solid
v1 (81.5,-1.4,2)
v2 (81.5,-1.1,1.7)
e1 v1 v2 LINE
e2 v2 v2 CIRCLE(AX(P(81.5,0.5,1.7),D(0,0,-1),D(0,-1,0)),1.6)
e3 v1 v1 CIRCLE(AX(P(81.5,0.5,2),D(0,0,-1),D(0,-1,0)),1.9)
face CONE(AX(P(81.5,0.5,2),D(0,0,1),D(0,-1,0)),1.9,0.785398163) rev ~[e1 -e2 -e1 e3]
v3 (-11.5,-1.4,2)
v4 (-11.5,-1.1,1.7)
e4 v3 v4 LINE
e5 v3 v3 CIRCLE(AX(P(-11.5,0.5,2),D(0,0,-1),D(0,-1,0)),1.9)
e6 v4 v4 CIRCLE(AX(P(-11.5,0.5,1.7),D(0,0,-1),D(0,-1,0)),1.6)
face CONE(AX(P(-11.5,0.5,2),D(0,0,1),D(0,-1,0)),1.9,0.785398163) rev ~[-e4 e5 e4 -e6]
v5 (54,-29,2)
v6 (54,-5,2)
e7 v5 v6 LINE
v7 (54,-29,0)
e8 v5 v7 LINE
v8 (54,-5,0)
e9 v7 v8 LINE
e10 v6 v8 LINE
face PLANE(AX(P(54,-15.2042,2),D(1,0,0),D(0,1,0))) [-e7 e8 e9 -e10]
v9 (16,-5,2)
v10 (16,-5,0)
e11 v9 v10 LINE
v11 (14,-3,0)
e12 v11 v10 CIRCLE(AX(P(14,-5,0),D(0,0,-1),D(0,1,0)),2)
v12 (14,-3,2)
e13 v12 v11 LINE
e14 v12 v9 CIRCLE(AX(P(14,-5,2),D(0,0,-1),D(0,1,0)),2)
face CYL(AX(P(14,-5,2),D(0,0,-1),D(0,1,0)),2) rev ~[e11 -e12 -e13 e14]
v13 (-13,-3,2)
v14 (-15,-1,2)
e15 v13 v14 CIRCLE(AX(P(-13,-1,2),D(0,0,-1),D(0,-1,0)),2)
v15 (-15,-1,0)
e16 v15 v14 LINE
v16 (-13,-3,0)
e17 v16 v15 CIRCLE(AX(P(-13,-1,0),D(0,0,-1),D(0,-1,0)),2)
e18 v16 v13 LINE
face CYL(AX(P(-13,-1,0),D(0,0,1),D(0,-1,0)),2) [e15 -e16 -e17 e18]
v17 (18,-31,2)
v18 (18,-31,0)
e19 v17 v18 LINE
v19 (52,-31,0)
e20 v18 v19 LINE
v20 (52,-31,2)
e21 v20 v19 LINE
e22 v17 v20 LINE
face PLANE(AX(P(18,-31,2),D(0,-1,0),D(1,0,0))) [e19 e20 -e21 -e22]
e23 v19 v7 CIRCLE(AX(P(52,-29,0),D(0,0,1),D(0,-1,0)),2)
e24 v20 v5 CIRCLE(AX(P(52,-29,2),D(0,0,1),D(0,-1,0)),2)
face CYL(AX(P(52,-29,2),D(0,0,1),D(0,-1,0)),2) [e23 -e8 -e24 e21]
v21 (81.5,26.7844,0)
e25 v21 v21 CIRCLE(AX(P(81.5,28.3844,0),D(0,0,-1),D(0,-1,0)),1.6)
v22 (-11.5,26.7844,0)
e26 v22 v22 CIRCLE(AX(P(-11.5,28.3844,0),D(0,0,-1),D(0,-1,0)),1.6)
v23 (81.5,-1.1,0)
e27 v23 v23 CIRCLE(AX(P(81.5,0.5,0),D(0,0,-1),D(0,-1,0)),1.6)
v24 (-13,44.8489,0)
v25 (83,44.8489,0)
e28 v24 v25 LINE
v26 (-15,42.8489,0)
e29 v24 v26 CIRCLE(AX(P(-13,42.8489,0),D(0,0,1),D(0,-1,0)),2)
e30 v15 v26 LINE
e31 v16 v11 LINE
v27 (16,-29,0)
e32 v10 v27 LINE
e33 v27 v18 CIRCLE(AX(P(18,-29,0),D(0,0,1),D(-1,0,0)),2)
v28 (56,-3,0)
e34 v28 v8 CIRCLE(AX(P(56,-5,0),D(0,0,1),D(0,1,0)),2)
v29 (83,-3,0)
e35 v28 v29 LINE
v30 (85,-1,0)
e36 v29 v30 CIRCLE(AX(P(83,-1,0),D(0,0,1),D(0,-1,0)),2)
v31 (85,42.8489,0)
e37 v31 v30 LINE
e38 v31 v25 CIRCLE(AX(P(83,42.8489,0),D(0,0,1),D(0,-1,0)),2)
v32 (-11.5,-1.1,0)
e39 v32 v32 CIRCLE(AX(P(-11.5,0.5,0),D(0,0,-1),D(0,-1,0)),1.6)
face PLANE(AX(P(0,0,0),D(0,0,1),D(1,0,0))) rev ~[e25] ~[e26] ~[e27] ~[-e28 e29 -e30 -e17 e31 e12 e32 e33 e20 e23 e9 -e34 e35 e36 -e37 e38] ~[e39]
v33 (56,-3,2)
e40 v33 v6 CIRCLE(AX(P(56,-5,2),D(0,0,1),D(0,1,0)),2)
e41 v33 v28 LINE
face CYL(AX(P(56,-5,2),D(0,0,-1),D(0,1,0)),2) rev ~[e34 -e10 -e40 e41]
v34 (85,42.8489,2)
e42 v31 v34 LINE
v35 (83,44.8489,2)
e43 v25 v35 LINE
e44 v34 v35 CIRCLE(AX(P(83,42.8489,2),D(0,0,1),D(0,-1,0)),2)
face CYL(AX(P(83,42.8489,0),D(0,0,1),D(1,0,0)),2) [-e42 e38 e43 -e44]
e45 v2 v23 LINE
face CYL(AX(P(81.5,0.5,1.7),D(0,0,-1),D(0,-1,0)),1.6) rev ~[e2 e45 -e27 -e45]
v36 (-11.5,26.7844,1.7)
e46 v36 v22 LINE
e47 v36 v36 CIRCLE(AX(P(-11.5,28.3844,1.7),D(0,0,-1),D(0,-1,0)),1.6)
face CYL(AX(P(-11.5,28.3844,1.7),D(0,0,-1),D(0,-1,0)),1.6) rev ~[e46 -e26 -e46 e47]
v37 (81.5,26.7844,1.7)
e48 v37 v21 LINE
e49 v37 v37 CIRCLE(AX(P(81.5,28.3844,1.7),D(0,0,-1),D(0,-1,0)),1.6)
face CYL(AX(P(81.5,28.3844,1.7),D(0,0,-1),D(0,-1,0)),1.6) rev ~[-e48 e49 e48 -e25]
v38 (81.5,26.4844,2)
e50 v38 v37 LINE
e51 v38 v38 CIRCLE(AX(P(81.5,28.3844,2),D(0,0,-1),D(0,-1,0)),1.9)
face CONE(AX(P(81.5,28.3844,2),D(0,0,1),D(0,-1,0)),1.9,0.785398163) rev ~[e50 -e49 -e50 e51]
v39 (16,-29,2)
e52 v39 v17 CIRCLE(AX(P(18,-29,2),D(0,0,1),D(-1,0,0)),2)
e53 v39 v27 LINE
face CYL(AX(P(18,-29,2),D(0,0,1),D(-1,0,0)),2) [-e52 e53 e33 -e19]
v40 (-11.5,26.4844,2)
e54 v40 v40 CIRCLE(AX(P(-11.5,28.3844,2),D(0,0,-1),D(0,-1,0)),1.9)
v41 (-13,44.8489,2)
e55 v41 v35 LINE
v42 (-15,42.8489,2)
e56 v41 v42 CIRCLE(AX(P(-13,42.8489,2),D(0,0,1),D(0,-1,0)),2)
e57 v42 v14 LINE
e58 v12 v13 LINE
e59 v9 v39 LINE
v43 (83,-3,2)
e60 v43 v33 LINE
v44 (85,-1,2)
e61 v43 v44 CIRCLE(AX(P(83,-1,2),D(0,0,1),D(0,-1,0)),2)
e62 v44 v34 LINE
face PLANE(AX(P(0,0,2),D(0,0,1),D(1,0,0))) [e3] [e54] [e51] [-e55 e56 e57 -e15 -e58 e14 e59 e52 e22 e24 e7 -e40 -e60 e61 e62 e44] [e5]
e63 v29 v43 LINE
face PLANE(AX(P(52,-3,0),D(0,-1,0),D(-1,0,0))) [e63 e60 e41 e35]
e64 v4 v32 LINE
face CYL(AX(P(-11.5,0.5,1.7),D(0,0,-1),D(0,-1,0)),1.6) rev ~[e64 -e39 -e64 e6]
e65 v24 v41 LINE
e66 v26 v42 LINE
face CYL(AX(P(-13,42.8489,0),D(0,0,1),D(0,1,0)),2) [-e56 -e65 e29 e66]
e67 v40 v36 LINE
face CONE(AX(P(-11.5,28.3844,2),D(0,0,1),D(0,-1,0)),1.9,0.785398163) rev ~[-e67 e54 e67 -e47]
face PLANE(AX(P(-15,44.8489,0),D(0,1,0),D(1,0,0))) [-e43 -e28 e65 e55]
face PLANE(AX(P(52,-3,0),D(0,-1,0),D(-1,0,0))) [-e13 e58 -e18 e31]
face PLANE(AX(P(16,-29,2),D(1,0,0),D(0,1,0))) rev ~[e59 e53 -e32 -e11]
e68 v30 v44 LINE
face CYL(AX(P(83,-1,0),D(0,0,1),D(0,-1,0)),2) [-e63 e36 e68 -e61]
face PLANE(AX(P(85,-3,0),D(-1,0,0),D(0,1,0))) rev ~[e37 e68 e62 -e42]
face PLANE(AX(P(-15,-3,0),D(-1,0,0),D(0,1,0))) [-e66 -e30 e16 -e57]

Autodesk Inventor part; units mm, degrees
ref_plane "YZ Plane" through (0, 0, 0) normal (1, 0, 0) x (0, 1, 0)
ref_plane "XZ Plane" through (0, 0, 0) normal (0, 1, 0) x (-1, 0, 0)
ref_plane "XY Plane" through (0, 0, 0) normal (0, 0, 1) x (1, 0, 0)
sketch "Szkic1" plane through (0, 0, 0) normal (0, 0, 1) x (1, 0, 0)
  line L0 (54, -15.2042) -> (54, -5) projected
  line L1 (18, -31) -> (52, -31) projected
  circle A0 centre (35, -25.5) radius 3.5 projected
  circle A1 centre (26, -7) radius 3.5 projected
  circle A2 centre (44, -7) radius 3.5 projected
  line L2 (18, -31) -> (52, -31) projected
  line L3 (54, -24.7958) -> (54, -29) projected
  line L4 (54, -15.2042) -> (54, -5) projected
  line L5 (52, -3) -> (18, -3) projected
  line L6 (16, -5) -> (16, -15.2042) projected
  line L7 (16, -24.7958) -> (16, -20) projected
  line L8 (85, -3) -> (85, 41.8489) projected
  line L9 (-15, 44.8489) -> (85, 44.8489) projected
  line L10 (-15, -3) -> (-15, 41.8489) projected
  line L11 (-15, -4) -> (15.8, -4)
  line L12 (85, 44.8489) -> (-15, 44.8489)
  line L13 (-15, 44.8489) -> (-15, -3)
  line L14 (-15, -3) -> (85, -3)
  line L15 (85, -3) -> (85, 44.8489)
  line L16 (52, -31) -> (16, -31)
  line L17 (16, -31) -> (16, -3)
  line L18 (16, -3) -> (52, -3)
  line L19 (52, -3) -> (52, -31)
  arc A3 (54, -5) -> (52, -3) centre (52, -5) ccw projected
  arc A4 (18, -3) -> (16, -5) centre (18, -5) ccw projected
  line L20 (16, -15.2042) -> (16, -20) projected
  line L21 (16, -29) -> (16, -24.7958) projected
  arc A5 (16, -29) -> (18, -31) centre (18, -29) ccw projected
  arc A6 (52, -31) -> (54, -29) centre (52, -29) ccw projected
  line L22 (54, -15.2042) -> (54, -24.7958) projected
  line L23 (54, -15.2042) -> (54, -15.2042) projected
  point P0 (0, 0)
  point P1 (54, -3)
  point P2 (52, -3)
extrude "Wyciągnięcie proste1" add sketch "Szkic1" along normal blind 2 contours L5 L14 L10 L13 L9 L15 L8
sketch "Szkic2" plane through (0, 0, 2) normal (0, 0, 1) x (1, 0, 0)
  circle A0 centre (81.5, 0.5) radius 2 projected
  circle A1 centre (81.5, 28.3844) radius 2 projected
  circle A2 centre (-11.5, 28.3844) radius 2 projected
  circle A3 centre (-11.5, 0.5) radius 2 projected
  point P0 (0, 0)
hole "Otwór1" at (81.5, 0.5, 2) at (81.5, 28.3844, 2) at (-11.5, 0.5, 2) at (-11.5, 28.3844, 2) direction (0, 0, -1) diameter 3.2 depth 7 tip angle 118 countersink diameter 3.8 countersink angle 90
sketch "Szkic3" plane through (0, 0, 2) normal (0, 0, 1) x (1, 0, 0)
  circle A0 centre (35, -25.5) radius 3.5 projected
  circle A1 centre (26, -7) radius 3.5 projected
  circle A2 centre (44, -7) radius 3.5 projected
  arc A3 (54, -5) -> (52, -3) centre (52, -5) ccw projected
  line L0 (52, -3) -> (18, -3) projected
  arc A4 (18, -3) -> (16, -5) centre (18, -5) ccw projected
  line L1 (16, -5) -> (16, -15.2042) projected
  line L2 (16, -15.2042) -> (16, -20) projected
  line L3 (16, -24.7958) -> (16, -20) projected
  line L4 (16, -29) -> (16, -24.7958) projected
  arc A5 (16, -29) -> (18, -31) centre (18, -29) ccw projected
  line L5 (18, -31) -> (52, -31) projected
  arc A6 (52, -31) -> (54, -29) centre (52, -29) ccw projected
  line L6 (54, -24.7958) -> (54, -29) projected
  line L7 (54, -20) -> (54, -24.7958) projected
  line L8 (54, -20) -> (54, -15.2042) projected
  line L9 (54, -15.2042) -> (54, -5) projected
  circle A7 centre (-11.5, 0.5) radius 1.9 projected
  circle A8 centre (81.5, 0.5) radius 1.9 projected
  circle A9 centre (81.5, 28.3844) radius 1.9 projected
  circle A10 centre (-11.5, 28.3844) radius 1.9 projected
  line L10 (85, 44.8489) -> (-15, 44.8489) projected
  line L11 (-15, 44.8489) -> (-15, -3) projected
  line L12 (-15, -3) -> (85, -3) projected
  line L13 (85, -3) -> (85, 44.8489) projected
  line L14 (16, -5) -> (16, -3)
  line L15 (54, -5) -> (54, -3)
  point P0 (0, 0)
  point P1 (52, -3)
extrude "Wyciągnięcie proste2" add sketch "Szkic3" against normal up to surface (2 mm away) contours A0 | A1 | A2 | L9 L8 L7 L6 A6 L5 A5 L4 L3 L2 L1 A4 L0 A3 | A3 L12 L15 | A4 L14 L12
fillet "Zaokrąglenie1" radius 2 6 edges at (85, -3, 1) (54, -3, 1) (85, 44.8489, 1) (16, -3, 1) (-15, -3, 1) (-15, 44.8489, 1)
properties part number "pokrywa"
